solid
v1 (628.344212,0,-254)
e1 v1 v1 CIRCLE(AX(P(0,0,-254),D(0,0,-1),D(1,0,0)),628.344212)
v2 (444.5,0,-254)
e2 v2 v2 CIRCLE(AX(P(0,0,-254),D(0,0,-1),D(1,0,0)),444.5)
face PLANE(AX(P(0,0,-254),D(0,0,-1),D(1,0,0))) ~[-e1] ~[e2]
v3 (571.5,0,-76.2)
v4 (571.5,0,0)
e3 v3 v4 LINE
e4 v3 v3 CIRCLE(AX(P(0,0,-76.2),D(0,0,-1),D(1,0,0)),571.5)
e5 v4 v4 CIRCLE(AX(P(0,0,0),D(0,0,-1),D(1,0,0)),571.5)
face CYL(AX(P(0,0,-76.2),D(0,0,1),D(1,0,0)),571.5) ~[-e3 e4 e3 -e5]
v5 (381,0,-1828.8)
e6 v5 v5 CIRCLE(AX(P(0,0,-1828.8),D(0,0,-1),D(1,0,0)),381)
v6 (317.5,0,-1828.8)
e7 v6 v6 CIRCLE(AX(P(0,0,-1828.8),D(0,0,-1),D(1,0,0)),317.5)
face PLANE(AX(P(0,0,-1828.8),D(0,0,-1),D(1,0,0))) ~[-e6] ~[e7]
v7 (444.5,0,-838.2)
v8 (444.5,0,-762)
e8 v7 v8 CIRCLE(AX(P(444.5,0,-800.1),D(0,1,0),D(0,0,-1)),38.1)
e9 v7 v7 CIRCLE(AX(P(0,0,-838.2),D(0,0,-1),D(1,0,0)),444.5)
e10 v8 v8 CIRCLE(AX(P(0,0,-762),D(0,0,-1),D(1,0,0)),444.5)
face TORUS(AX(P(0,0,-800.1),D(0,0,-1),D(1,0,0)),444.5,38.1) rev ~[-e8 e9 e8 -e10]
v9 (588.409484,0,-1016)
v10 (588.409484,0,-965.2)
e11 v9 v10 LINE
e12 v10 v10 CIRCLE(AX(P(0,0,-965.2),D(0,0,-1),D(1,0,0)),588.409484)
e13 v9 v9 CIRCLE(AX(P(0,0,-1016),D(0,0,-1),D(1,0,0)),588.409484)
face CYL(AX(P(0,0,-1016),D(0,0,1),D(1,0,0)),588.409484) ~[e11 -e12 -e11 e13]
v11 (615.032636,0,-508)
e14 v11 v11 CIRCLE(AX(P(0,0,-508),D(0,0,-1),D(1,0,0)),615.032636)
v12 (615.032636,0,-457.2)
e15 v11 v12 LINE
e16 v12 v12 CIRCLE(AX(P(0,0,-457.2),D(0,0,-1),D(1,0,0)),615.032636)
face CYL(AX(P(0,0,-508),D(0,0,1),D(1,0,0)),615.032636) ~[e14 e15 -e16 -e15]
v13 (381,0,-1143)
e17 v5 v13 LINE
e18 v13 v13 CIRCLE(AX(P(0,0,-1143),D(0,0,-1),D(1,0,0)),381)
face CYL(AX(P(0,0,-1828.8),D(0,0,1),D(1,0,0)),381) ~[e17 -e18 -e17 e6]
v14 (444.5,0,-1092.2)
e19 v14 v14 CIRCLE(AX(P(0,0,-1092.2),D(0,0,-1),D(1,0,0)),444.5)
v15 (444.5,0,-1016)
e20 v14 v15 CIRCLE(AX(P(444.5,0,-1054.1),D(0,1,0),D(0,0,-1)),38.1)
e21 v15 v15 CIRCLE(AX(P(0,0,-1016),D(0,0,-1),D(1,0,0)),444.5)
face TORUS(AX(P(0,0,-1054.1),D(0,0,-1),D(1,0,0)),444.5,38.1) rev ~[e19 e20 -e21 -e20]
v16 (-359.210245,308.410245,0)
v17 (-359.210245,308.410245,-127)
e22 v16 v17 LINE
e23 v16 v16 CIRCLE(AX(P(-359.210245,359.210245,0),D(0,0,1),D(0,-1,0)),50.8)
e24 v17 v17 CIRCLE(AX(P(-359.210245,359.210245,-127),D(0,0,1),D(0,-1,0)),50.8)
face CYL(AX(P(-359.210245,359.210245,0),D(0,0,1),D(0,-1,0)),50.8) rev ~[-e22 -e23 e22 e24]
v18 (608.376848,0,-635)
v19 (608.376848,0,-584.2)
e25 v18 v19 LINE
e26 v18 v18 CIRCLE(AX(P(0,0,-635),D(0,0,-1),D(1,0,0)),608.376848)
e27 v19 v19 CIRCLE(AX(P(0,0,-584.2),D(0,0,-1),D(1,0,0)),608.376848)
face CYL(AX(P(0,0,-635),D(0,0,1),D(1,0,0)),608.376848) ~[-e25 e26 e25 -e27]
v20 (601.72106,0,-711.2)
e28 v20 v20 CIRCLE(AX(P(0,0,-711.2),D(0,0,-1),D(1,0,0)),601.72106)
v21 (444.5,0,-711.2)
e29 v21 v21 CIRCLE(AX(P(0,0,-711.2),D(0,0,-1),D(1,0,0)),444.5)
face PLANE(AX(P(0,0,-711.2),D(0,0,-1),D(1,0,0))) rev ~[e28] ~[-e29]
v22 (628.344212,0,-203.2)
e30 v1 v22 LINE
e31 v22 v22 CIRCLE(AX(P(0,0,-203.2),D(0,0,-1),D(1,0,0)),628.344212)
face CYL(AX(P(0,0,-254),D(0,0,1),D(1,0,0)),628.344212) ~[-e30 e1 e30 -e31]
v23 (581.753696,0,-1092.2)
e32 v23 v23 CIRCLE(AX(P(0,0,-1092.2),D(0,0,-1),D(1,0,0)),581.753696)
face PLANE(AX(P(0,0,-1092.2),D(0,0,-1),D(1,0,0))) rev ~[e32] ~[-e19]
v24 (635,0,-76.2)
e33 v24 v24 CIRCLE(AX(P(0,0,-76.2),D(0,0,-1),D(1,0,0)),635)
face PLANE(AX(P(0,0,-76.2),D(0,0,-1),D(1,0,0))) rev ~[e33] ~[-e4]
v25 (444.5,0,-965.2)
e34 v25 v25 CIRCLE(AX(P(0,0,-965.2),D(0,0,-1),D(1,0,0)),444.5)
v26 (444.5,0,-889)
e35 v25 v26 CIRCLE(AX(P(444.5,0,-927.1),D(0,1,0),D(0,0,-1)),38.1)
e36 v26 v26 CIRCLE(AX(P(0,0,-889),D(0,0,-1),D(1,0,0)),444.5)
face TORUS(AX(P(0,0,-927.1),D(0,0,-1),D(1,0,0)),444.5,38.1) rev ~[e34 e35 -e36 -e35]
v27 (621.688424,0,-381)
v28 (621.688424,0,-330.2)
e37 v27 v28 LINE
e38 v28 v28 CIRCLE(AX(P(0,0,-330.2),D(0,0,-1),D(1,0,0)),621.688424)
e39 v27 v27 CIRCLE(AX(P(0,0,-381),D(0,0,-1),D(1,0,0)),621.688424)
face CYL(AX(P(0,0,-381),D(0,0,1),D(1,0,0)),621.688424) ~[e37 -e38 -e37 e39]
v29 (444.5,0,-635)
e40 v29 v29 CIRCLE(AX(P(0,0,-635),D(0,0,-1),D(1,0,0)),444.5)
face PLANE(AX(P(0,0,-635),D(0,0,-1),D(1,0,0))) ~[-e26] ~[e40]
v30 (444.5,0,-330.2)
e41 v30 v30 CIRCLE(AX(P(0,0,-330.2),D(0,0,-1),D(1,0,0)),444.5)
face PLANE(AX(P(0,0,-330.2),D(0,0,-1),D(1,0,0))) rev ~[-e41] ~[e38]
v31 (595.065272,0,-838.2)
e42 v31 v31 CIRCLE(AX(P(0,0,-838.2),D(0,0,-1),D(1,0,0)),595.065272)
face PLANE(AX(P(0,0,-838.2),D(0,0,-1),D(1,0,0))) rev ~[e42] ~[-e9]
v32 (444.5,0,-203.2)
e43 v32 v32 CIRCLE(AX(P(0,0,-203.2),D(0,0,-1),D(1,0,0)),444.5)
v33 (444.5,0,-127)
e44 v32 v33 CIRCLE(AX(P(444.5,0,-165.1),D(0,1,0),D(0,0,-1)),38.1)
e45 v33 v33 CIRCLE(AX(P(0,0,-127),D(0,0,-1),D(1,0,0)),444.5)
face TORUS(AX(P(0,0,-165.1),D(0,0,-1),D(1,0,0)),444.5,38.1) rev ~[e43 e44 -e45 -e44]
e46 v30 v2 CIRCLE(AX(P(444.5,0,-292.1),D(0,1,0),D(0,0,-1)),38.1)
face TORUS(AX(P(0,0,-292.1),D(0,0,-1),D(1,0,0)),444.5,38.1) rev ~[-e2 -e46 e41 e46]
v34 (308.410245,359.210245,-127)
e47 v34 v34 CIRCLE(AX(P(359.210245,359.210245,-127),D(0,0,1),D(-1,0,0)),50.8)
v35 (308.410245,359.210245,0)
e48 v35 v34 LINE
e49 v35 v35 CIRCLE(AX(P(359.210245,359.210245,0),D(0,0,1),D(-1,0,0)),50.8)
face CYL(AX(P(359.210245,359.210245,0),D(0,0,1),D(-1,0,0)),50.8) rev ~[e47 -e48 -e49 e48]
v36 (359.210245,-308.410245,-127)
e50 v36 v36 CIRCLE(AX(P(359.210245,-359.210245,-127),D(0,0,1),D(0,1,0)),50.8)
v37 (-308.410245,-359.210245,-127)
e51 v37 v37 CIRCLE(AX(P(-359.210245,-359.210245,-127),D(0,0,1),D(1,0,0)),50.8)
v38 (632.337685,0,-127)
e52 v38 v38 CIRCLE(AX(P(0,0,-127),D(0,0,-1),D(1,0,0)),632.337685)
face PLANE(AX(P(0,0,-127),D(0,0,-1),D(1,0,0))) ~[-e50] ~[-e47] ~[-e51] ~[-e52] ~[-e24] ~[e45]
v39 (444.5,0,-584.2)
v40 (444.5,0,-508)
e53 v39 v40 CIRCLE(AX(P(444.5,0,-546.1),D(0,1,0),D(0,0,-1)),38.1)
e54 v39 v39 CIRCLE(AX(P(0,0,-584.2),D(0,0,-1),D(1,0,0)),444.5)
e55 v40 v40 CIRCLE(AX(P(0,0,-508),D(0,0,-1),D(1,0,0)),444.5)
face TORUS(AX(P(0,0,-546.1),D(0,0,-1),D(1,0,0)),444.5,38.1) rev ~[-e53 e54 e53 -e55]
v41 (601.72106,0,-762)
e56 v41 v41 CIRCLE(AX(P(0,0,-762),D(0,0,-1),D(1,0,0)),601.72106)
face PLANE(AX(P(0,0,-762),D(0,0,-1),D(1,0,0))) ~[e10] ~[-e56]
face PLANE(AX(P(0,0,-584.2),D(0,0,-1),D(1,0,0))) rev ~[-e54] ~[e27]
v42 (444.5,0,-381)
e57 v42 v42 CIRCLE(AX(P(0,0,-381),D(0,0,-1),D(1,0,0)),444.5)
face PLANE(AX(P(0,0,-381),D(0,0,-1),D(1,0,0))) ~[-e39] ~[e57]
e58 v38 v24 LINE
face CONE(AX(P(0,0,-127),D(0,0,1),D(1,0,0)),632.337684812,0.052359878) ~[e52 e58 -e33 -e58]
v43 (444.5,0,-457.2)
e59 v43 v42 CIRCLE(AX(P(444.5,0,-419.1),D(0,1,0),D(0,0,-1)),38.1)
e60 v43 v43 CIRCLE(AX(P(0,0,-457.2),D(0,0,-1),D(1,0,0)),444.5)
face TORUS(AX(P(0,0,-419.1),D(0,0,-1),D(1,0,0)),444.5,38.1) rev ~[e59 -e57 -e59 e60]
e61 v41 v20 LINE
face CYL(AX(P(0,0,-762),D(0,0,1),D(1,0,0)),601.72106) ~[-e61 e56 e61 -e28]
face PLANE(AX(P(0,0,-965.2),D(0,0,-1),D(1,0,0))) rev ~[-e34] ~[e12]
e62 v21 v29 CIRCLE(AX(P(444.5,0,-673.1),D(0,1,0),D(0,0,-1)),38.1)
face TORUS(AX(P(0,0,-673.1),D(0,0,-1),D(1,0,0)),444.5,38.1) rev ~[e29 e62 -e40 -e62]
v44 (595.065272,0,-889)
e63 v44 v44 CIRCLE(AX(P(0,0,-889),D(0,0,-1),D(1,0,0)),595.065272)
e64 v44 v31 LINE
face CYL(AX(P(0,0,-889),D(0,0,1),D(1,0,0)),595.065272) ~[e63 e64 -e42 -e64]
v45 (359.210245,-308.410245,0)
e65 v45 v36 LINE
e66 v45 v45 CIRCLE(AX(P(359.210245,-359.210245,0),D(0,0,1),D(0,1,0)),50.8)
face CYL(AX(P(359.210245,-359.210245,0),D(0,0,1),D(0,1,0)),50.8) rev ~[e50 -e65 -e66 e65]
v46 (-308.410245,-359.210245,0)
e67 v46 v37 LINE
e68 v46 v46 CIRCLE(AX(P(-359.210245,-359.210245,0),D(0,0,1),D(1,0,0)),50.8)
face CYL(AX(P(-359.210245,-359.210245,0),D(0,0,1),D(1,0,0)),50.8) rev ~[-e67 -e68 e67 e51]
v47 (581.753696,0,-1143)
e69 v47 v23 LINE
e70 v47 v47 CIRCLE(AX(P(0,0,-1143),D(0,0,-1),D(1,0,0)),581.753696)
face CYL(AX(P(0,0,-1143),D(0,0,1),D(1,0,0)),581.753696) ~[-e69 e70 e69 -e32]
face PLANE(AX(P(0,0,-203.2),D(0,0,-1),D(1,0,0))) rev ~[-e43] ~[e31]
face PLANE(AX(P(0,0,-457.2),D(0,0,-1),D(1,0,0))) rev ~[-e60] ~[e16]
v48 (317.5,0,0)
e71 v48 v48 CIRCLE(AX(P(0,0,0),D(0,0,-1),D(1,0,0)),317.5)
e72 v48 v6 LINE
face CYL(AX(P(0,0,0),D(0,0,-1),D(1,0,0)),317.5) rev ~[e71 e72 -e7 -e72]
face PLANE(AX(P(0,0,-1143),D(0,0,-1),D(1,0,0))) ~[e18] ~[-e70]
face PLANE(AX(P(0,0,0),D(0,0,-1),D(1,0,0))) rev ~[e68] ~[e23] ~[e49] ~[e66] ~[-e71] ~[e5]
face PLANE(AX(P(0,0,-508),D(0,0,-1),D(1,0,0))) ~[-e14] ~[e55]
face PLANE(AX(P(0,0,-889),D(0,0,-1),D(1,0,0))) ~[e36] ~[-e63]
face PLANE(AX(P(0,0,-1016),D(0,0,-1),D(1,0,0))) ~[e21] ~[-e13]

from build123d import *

# Parameters (mm, degrees)
F2_R            = 50.8
F3_DEPTH        = 127
F3_COPIES_COUNT = 4


# Not quite as in the source:
# - a pattern or mirror of a feature is missing from the dataset's text; its kind, count and spacing are read off the source's solid


with BuildPart() as f1:
    # F0 (on Front) → F1 (revolve)
    with BuildSketch(Plane.XZ):
        with BuildLine():
            Line((571.5, -76.2), (317.5, -76.2))
            Line((317.5, -76.2), (317.5, -1828.8))
            Line((317.5, -1828.8), (381, -1828.8))
            Line((381, -1828.8), (381, -1651))
            Line((381, -1651), (381, -1524))
            Line((381, -1524), (381, -1143))
            Line((381, -1143), (444.5, -1143))
            Line((444.5, -1143), (579.0913810609, -1143))
            Line((579.0913810609, -1143), (581.7536962484, -1143))
            Line((581.7536962484, -1143), (581.7536962484, -1092.2))
            Line((581.7536962484, -1092.2), (444.5, -1092.2))
            ThreePointArc((444.5, -1092.2), (406.4, -1054.1), (444.5, -1016))
            Line((444.5, -1016), (588.4094842174, -1016))
            Line((588.4094842174, -1016), (588.4094842174, -965.2))
            Line((588.4094842174, -965.2), (444.5, -965.2))
            ThreePointArc((444.5, -965.2), (406.4, -927.1), (444.5, -889))
            Line((444.5, -889), (595.0652721863, -889))
            Line((595.0652721863, -889), (595.0652721863, -838.2))
            Line((595.0652721863, -838.2), (444.5, -838.2))
            ThreePointArc((444.5, -838.2), (406.4, -800.1), (444.5, -762))
            Line((444.5, -762), (601.7210601553, -762))
            Line((601.7210601553, -762), (601.7210601553, -711.2))
            Line((601.7210601553, -711.2), (444.5, -711.2))
            ThreePointArc((444.5, -711.2), (406.4, -673.1), (444.5, -635))
            Line((444.5, -635), (608.3768481242, -635))
            Line((608.3768481242, -635), (608.3768481242, -584.2))
            Line((608.3768481242, -584.2), (444.5, -584.2))
            ThreePointArc((444.5, -584.2), (406.4, -546.1), (444.5, -508))
            Line((444.5, -508), (615.0326360932, -508))
            Line((615.0326360932, -508), (615.0326360932, -457.2))
            Line((615.0326360932, -457.2), (444.5, -457.2))
            ThreePointArc((444.5, -457.2), (406.4, -419.1), (444.5, -381))
            Line((444.5, -381), (621.6884240621, -381))
            Line((621.6884240621, -381), (621.6884240621, -330.2))
            Line((621.6884240621, -330.2), (444.5, -330.2))
            ThreePointArc((444.5, -330.2), (406.4, -292.1), (444.5, -254))
            Line((444.5, -254), (628.3442120311, -254))
            Line((628.3442120311, -254), (628.3442120311, -203.2))
            Line((628.3442120311, -203.2), (444.5, -203.2))
            ThreePointArc((444.5, -203.2), (406.4, -165.1), (444.5, -127))
            Line((444.5, -127), (632.3376848124, -127))
            Line((632.3376848124, -127), (635, -76.2))
            Line((635, -76.2), (571.5, -76.2))
        make_face()
        Polygon((381, 0), (317.5, 0), (317.5, -76.2), (571.5, -76.2), (571.5, 0), align=None)
    revolve(axis=Axis((0, 0, -597.5417420604), (0, 0, -1)))

    # F2 (on Top) → F3 (cut, through all)
    with BuildSketch(Plane.XY):
        with Locations((-359.2102448428, -359.2102448428)):
            Circle(F2_R)
    f3 = extrude(amount=-F3_DEPTH, mode=Mode.SUBTRACT)

    # F3_copies: F3 ×4 about axis
    f3_copies_axis = Axis((0, 0, 0), (0, 0, 1))
    for i in range(1, F3_COPIES_COUNT):
        add(f3.rotate(f3_copies_axis, i * 360 / F3_COPIES_COUNT), mode=Mode.SUBTRACT)


solid = f1.part
